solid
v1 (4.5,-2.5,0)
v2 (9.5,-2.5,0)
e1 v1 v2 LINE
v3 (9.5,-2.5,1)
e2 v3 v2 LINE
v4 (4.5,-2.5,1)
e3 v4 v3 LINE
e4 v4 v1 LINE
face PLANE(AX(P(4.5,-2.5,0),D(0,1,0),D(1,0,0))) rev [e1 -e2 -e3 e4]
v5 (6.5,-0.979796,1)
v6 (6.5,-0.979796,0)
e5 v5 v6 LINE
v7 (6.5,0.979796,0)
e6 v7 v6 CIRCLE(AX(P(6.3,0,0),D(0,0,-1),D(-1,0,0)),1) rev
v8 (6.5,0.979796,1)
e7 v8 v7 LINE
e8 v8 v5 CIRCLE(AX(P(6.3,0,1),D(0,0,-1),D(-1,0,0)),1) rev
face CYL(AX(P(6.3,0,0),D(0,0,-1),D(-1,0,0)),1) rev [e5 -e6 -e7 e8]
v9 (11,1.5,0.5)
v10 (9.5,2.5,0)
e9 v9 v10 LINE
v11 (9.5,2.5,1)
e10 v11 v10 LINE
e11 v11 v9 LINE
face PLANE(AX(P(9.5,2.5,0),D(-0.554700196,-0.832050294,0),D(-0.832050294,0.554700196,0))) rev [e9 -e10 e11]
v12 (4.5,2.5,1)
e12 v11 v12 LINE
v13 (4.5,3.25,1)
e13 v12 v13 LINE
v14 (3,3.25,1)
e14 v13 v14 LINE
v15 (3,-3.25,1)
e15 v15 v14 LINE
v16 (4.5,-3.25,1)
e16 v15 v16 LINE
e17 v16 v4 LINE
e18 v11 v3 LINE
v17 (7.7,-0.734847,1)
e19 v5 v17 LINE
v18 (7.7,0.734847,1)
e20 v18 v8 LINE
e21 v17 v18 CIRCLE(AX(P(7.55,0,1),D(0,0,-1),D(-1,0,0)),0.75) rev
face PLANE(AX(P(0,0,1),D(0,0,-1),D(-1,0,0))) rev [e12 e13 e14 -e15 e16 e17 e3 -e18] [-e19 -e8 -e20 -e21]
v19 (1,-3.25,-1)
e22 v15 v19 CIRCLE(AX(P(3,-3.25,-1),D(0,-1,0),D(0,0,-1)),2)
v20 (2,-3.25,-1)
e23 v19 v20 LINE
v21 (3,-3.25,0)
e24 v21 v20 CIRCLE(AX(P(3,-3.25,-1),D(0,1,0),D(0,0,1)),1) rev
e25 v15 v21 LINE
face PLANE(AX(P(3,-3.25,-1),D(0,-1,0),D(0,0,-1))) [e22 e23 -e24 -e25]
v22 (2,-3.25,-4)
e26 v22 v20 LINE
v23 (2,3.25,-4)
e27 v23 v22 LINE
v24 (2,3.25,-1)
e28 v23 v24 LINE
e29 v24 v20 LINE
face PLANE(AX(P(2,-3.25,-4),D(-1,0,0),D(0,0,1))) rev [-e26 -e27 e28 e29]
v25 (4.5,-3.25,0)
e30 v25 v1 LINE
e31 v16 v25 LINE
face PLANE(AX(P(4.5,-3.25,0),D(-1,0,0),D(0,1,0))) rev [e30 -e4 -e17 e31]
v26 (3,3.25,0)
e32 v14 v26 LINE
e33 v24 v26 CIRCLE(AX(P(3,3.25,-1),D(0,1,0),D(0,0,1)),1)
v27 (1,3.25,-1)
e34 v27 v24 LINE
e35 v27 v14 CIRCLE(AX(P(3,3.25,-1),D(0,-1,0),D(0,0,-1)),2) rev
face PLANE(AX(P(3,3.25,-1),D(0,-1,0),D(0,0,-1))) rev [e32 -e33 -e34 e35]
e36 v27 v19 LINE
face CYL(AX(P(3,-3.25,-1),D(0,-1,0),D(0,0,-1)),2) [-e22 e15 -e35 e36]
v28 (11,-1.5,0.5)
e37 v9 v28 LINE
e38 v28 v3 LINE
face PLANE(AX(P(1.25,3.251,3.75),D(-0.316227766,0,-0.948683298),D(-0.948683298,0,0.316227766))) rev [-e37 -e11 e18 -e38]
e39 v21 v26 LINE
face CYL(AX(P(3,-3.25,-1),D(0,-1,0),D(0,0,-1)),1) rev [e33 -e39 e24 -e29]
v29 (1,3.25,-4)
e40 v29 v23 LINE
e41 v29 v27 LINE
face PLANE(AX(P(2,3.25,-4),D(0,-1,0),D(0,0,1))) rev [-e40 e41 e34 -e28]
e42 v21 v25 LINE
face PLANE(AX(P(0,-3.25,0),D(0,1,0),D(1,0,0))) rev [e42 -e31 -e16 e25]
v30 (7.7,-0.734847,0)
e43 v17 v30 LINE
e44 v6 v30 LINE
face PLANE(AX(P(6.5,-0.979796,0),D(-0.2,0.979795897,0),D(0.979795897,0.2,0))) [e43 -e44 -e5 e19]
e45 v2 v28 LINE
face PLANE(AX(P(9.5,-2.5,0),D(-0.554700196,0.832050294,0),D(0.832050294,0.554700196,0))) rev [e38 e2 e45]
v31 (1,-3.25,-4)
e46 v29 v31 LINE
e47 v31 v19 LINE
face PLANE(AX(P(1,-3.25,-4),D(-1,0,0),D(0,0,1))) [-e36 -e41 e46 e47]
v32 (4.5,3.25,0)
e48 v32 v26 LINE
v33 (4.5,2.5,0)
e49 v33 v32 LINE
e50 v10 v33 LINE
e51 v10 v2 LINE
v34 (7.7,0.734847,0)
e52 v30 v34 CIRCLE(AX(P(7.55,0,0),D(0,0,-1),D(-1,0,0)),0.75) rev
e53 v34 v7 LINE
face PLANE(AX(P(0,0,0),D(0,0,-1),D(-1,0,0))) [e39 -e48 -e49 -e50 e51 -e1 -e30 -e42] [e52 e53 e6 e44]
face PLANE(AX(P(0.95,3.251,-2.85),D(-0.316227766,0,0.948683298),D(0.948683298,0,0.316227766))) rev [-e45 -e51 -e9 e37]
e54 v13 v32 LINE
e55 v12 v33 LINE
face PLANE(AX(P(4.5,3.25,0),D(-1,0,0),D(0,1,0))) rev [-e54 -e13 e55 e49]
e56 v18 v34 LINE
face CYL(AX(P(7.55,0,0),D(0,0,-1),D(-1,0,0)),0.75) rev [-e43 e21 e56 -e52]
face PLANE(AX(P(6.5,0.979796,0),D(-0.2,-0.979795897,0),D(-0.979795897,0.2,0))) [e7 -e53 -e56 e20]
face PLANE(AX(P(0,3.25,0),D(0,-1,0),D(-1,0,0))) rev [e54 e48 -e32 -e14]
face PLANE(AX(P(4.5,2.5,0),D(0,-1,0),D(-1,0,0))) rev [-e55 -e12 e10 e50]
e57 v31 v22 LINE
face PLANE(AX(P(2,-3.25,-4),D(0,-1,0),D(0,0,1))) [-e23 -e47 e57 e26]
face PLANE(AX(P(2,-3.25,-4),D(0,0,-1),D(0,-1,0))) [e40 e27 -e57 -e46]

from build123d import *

# Parameters (mm, degrees)
DODANIE_WYCI_GNI_CIE1_DEPTH = 1
WYTNIJ_WYCI_GNI_CIE1_REACH  = 13.514
SZKIC8_W                    = 1
SZKIC8_H                    = 6.5
DODANIE_WYCI_GNI_CIE2_DEPTH = 4
WYTNIJ_WYCI_GNI_CIE2_REACH  = 14.148
SZKIC9_W                    = 1
SZKIC9_H                    = 6.5
KONWERTUJ_START             = -3.25
KONWERTUJ_BRY_2_DEPTH       = 6.5
KONWERTUJ_BRY_2_2_DEPTH     = 6.5
WYTNIJ_WYCI_GNI_CIE3_REACH  = 15.041


# Read off the part's stored shape, not the designer's step: Konwertuj bryłę2
with BuildPart() as part:
    # Szkic1 → Dodanie-wyciągnięcie1 (new body)
    with BuildSketch(Plane.XY):
        Polygon((0, -3.25), (0, 3.25), (4.5, 3.25), (4.5, 2.5), (9.5, 2.5), (11, 1.5), (11, -1.5), (9.5, -2.5), (4.5, -2.5), (4.5, -3.25), align=None)
    extrude(amount=DODANIE_WYCI_GNI_CIE1_DEPTH)

    # Szkic2 → Wytnij-wyciągnięcie1 (cut, up to next)
    with BuildSketch(Plane.XY.offset(1), mode=Mode.PRIVATE) as wytnij_wyci_gni_cie1_sk1:
        with BuildLine():
            Line((6.5, 0.979795897), (7.7, 0.734846923))
            ThreePointArc((7.7, 0.734846923), (8.3, 0), (7.7, -0.734846923))
            Line((7.7, -0.734846923), (6.5, -0.979795897))
            ThreePointArc((6.5, -0.979795897), (5.3, 0), (6.5, 0.979795897))
        make_face()
    wytnij_wyci_gni_cie1_tool1 = extrude(wytnij_wyci_gni_cie1_sk1.sketch, amount=-WYTNIJ_WYCI_GNI_CIE1_REACH, mode=Mode.PRIVATE) & part.part
    add(wytnij_wyci_gni_cie1_tool1.solids().sort_by_distance((6.737463, 0, 1))[0], mode=Mode.SUBTRACT)

    # Szkic8 → Dodanie-wyciągnięcie2 (add)
    with BuildSketch(Plane(origin=(0, 0, 0), x_dir=(-1, 0, 0), z_dir=(0, 0, -1))):
        with Locations((-1.5, 0)):
            Rectangle(SZKIC8_W, SZKIC8_H)
    extrude(amount=DODANIE_WYCI_GNI_CIE2_DEPTH)

    # Szkic9 → Wytnij-wyciągnięcie2 (cut, up to next)
    with BuildSketch(Plane(origin=(0, 0, 0), x_dir=(-1, 0, 0), z_dir=(0, 0, -1)), mode=Mode.PRIVATE) as wytnij_wyci_gni_cie2_sk1:
        with Locations((-0.5, 0)):
            Rectangle(SZKIC9_W, SZKIC9_H)
    wytnij_wyci_gni_cie2_tool1 = extrude(wytnij_wyci_gni_cie2_sk1.sketch, amount=-WYTNIJ_WYCI_GNI_CIE2_REACH, mode=Mode.PRIVATE) & part.part
    add(wytnij_wyci_gni_cie2_tool1.solids().sort_by_distance((0.5, 0, 0))[0], mode=Mode.SUBTRACT)

    # Konwertuj bryłę2 outline → Konwertuj bryłę2 (cut)
    with BuildSketch(Plane(origin=(0, 0, 0), x_dir=(1, 0, 0), z_dir=(0, 1, 0)).offset(KONWERTUJ_START)):
        with BuildLine():
            Line((1, -1), (3, -1))
            ThreePointArc((3, -1), (1.585786438, -0.414213562), (1, 1))
            Line((1, 1), (1, -1))
        make_face()
    extrude(amount=KONWERTUJ_BRY_2_DEPTH, mode=Mode.SUBTRACT)

    # Konwertuj bry_2 2 outline → Konwertuj bry_2 2 (add)
    with BuildSketch(Plane(origin=(0, 0, 0), x_dir=(1, 0, 0), z_dir=(0, 1, 0)).offset(KONWERTUJ_START)):
        with BuildLine():
            Line((2, 0), (3, 0))
            ThreePointArc((3, 0), (2.292893219, 0.292893219), (2, 1))
            Line((2, 1), (2, 0))
        make_face()
    extrude(amount=KONWERTUJ_BRY_2_2_DEPTH)

    # Wytnij-wyciągnięcie3: up to this plane
    wytnij_wyci_gni_cie3_end = Plane(origin=(9.5, 2.5, 0), z_dir=(-0.5547001962252293, -0.8320502943378437, 0))
    # Szkic14 → Wytnij-wyciągnięcie3 (cut, up to the surface)
    with BuildSketch(Plane.XZ.offset(2.5), mode=Mode.PRIVATE) as wytnij_wyci_gni_cie3_sk1:
        Polygon((11, 0), (11, 0.5), (9.5, 0), align=None)
    wytnij_wyci_gni_cie3_tool1 = split(extrude(wytnij_wyci_gni_cie3_sk1.sketch, amount=-WYTNIJ_WYCI_GNI_CIE3_REACH, mode=Mode.PRIVATE), bisect_by=wytnij_wyci_gni_cie3_end, keep=Keep.BOTH, mode=Mode.PRIVATE)
    add(wytnij_wyci_gni_cie3_tool1.solids().sort_by_distance((10.5, -2.5, 0.166667))[0], mode=Mode.SUBTRACT)
    # Szkic14 → Wytnij-wyciągnięcie3 (cut, up to the surface)
    with BuildSketch(Plane.XZ.offset(2.5), mode=Mode.PRIVATE) as wytnij_wyci_gni_cie3_sk2:
        Polygon((11, 0.5), (11, 1), (9.5, 1), align=None)
    wytnij_wyci_gni_cie3_tool2 = split(extrude(wytnij_wyci_gni_cie3_sk2.sketch, amount=-WYTNIJ_WYCI_GNI_CIE3_REACH, mode=Mode.PRIVATE), bisect_by=wytnij_wyci_gni_cie3_end, keep=Keep.BOTH, mode=Mode.PRIVATE)
    add(wytnij_wyci_gni_cie3_tool2.solids().sort_by_distance((10.5, -2.5, 0.833333))[0], mode=Mode.SUBTRACT)


solid = part.part
